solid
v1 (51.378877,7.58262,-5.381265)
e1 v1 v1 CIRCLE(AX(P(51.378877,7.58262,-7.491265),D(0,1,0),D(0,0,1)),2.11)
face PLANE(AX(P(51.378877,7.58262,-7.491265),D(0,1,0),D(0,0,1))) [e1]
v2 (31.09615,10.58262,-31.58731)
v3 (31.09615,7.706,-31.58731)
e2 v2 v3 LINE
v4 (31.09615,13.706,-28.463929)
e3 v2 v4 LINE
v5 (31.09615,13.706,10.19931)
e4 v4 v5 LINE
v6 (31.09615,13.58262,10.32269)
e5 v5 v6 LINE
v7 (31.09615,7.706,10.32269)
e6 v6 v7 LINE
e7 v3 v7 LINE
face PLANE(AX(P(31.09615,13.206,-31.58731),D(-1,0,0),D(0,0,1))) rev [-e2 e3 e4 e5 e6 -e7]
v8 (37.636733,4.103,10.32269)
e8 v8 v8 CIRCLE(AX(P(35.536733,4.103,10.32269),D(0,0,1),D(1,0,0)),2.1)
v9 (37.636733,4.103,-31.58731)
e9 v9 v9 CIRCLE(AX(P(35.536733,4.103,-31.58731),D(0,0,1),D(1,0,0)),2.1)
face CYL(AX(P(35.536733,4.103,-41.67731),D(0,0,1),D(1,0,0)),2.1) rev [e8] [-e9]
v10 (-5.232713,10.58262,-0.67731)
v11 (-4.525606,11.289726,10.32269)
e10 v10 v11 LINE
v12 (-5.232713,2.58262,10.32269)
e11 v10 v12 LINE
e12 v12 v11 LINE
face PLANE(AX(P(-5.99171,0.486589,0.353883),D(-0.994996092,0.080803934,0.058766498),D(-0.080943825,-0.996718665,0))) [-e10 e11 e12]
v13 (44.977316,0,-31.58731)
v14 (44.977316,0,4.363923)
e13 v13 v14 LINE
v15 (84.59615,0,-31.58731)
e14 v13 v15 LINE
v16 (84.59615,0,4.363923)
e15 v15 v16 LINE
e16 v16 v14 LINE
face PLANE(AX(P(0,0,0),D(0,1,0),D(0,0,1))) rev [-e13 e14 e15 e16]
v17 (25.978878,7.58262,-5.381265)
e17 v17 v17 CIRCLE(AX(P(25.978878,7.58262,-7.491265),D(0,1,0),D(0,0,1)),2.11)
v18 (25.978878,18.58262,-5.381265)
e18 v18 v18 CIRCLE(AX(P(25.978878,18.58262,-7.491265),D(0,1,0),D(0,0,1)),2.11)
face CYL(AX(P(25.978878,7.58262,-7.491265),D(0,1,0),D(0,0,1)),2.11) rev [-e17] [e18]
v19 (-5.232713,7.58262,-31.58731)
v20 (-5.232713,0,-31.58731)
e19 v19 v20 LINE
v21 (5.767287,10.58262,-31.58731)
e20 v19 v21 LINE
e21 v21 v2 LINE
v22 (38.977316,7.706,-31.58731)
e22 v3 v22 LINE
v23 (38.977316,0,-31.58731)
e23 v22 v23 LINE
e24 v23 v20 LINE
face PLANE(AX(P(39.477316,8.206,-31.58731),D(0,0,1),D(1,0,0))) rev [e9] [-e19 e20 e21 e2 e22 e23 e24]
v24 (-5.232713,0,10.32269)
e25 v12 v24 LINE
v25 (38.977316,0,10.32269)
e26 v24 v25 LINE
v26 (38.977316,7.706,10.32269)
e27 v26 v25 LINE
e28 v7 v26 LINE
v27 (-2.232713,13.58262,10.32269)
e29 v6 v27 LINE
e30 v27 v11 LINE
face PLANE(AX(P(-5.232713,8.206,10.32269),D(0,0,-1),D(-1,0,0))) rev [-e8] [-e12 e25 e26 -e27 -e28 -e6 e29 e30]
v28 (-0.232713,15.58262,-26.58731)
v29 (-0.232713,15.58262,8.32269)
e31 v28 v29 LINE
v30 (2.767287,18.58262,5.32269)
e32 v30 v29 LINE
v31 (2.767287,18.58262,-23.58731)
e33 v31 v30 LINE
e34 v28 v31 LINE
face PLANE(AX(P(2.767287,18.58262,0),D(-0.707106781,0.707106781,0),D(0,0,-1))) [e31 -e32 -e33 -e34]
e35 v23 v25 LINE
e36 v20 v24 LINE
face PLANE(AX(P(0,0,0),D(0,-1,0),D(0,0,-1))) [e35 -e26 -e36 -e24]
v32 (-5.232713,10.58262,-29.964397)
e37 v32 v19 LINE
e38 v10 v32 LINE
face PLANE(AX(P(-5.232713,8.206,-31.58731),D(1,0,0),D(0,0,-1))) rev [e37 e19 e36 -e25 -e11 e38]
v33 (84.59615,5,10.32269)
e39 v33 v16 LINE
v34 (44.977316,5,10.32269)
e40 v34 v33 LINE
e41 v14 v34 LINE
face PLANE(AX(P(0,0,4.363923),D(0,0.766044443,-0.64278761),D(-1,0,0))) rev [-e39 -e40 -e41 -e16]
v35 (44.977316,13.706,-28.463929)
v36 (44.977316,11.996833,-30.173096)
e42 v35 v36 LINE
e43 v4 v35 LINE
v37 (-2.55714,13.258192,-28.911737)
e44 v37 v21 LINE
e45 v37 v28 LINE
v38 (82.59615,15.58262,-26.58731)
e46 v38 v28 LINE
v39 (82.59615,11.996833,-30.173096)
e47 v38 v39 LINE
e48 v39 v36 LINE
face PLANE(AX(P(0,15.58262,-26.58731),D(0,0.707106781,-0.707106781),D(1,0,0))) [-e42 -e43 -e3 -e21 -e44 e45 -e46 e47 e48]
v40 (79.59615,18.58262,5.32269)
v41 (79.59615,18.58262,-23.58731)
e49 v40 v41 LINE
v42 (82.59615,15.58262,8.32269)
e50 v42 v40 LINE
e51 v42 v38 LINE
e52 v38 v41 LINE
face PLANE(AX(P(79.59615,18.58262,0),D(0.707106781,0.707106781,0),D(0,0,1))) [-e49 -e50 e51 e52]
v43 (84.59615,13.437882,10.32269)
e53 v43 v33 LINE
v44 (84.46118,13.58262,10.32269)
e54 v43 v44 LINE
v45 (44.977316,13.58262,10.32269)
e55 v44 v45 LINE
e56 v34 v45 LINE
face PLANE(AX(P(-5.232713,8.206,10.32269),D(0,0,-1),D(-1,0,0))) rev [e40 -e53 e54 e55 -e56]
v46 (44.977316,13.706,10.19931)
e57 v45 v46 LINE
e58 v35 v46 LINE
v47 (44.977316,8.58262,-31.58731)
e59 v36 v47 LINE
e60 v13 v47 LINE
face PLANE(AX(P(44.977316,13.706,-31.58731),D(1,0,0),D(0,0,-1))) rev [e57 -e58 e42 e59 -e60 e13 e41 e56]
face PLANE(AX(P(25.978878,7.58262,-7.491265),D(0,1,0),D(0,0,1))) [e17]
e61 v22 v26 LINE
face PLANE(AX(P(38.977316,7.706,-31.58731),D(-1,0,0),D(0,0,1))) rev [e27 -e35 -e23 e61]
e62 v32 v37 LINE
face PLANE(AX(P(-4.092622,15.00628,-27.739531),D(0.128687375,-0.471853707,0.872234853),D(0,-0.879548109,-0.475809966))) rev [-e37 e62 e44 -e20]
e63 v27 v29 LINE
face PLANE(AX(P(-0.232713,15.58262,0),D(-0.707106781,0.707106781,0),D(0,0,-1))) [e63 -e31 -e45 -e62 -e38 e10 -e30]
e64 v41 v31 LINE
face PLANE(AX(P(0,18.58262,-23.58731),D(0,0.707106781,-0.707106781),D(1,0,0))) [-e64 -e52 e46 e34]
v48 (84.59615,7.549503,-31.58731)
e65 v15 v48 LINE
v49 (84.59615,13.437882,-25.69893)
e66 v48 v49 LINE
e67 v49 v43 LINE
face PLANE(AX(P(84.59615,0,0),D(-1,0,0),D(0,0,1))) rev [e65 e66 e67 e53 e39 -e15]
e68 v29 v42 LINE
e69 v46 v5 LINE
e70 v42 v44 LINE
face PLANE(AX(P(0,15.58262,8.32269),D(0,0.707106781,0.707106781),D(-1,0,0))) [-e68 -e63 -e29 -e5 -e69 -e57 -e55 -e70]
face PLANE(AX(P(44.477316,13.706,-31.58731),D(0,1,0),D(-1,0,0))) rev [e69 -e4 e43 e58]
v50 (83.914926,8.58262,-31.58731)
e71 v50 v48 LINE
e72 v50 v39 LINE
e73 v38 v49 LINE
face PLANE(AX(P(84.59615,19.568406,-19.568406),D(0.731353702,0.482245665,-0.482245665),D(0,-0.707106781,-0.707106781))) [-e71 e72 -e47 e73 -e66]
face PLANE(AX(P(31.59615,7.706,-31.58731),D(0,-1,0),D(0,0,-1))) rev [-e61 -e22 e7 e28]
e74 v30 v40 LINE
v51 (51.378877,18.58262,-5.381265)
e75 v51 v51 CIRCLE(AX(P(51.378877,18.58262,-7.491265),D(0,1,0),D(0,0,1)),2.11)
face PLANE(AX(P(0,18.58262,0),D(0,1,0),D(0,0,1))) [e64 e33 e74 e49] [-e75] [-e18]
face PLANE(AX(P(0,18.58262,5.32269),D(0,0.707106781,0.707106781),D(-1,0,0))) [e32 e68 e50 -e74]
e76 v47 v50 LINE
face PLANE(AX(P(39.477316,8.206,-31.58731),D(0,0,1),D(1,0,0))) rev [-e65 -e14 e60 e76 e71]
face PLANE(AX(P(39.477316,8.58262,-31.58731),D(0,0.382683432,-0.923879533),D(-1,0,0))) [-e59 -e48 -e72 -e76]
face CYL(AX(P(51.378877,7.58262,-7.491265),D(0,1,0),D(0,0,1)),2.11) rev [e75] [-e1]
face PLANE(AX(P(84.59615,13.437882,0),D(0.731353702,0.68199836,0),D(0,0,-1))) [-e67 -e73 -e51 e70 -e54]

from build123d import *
from OCP.BRepAlgoAPI import BRepAlgoAPI_Cut
from OCP.TopTools import TopTools_ListOfShape
from OCP.BRepFilletAPI import BRepFilletAPI_MakeChamfer

# Parameters (mm, degrees)
BOSS_EXTRUDE1_DEPTH = 8.206
SKETCH2_W           = 36.828862806
SKETCH2_H           = 41.91
BOSS_EXTRUDE2_DEPTH = 7.37662
SKETCH3_W           = 41.91
SKETCH3_H           = 2.37661953
BOSS_EXTRUDE3_DEPTH = 53
SKETCH4_W           = 40.118833935
SKETCH4_H           = 41.91
BOSS_EXTRUDE4_DEPTH = 13.206
SKETCH6_R           = 2.11
CUT_EXTRUDE1_DEPTH  = 8
CHAMFER1_SIZE       = 5
CHAMFER2_START      = -34
CHAMFER2_OUTLINE_W  = 14
CHAMFER2_OUTLINE_H  = 11
CHAMFER2_DEPTH      = 2.19717655
CHAMFER3_SIZE       = 5
CHAMFER6_START      = -8
CHAMFER6_OUTLINE_W  = 11
CHAMFER6_OUTLINE_H  = 14
CHAMFER6_DEPTH      = 1.978157275
CHAMFER7_SIZE       = 2
CHAMFER7_SIZE2      = 2.14473742
CHAMFER8_SIZE       = 2
CHAMFER9_SIZE       = 5
CHAMFER9_SIZE2      = 5.958767963
SKETCH7_R           = 2.1
CUT_EXTRUDE2_DEPTH  = 52
CUT_EXTRUDE3_DEPTH  = 41.91
BOSS_EXTRUDE6_START = 3
SKETCH11_W          = 82.828862806
SKETCH11_H          = 34.91
SKETCH11_R          = 2.11
BOSS_EXTRUDE6_DEPTH = 3
CHAMFER10_SIZE      = 3
CHAMFER11_SIZE      = 3
CHAMFER12_SIZE      = 3
CHAMFER13_SIZE      = 3


with BuildPart() as part:
    # Sketch1 → Boss-Extrude1 (new body)
    with BuildSketch(Plane(origin=(0, 0, 0), x_dir=(1, 0, 0), z_dir=(0, 1, 0))):
        Polygon((39.477316318, 14.786556642), (39.477316318, 31.587309514), (-5.232712553, 31.587309514), (-5.232712553, -10.322690486), (39.477316318, -10.322690486), align=None)
    extrude(amount=BOSS_EXTRUDE1_DEPTH)

    # Sketch2 → Boss-Extrude2 (add)
    with BuildSketch(Plane(origin=(0, 8.206, 0), x_dir=(1, 0, 0), z_dir=(0, 1, 0))):
        with Locations((13.18171885, 10.632309514)):
            Rectangle(SKETCH2_W, SKETCH2_H)
    extrude(amount=BOSS_EXTRUDE2_DEPTH)

    # Sketch3 → Boss-Extrude3 (add)
    with BuildSketch(Plane(origin=(31.596150253, 0, 0), x_dir=(0, 0, -1), z_dir=(1, 0, 0))):
        with Locations((10.632309514, 14.394309765)):
            Rectangle(SKETCH3_W, SKETCH3_H)
    extrude(amount=BOSS_EXTRUDE3_DEPTH)

    # Sketch4 → Boss-Extrude4 (add)
    with BuildSketch(Plane.XZ.offset(-13.206)):
        with Locations((64.536733286, -10.632309514)):
            Rectangle(SKETCH4_W, SKETCH4_H)
    extrude(amount=BOSS_EXTRUDE4_DEPTH)


with BuildPart() as cut_extrude1_tool:
    # Sketch6 → Cut-Extrude1 (new body)
    with BuildSketch(Plane(origin=(0, 15.58261953, 0), x_dir=(1, 0, 0), z_dir=(0, 1, 0))):
        with Locations(Location((25.978877621, 7.491265073, 0), (0, 0, 270))):
            Circle(SKETCH6_R)
        with Locations(Location((51.378877239, 7.491265073, 0), (0, 0, 270))):
            Circle(SKETCH6_R)
    extrude(amount=-CUT_EXTRUDE1_DEPTH)


with BuildPart() as part_1:
    add(part.part)

    # Cut-Extrude1: cut by cut_extrude1_tool, with a tolerance
    cut_extrude1_stock = TopTools_ListOfShape()
    cut_extrude1_stock.Append(part_1.part.wrapped)
    cut_extrude1_tools = TopTools_ListOfShape()
    cut_extrude1_tools.Append(cut_extrude1_tool.part.wrapped)
    cut_extrude1_cut = BRepAlgoAPI_Cut()
    cut_extrude1_cut.SetArguments(cut_extrude1_stock)
    cut_extrude1_cut.SetTools(cut_extrude1_tools)
    cut_extrude1_cut.SetFuzzyValue(0.00001)
    cut_extrude1_cut.Build()
    add(Compound.cast(cut_extrude1_cut.Shape()).solids(), mode=Mode.REPLACE)

    # Chamfer1
    # the kernel refuses this chamfer: 5 mm, written as the material it takes off along each edge
    with BuildSketch(Plane(origin=(31.596150253, 15.58261953, -31.587309514), x_dir=(0, -1, 0), z_dir=(1, 0, 0))) as chamfer1_piece_1:
        Polygon((CHAMFER1_SIZE, 0), (0, -CHAMFER1_SIZE), (0, 0), align=None)
    extrude(amount=65.85841494, mode=Mode.SUBTRACT)
    with BuildSketch(Plane(origin=(-18.091127493, 15.58262, -31.587309514), x_dir=(0, -1, 0), z_dir=(1, 0, 0))) as chamfer1_piece_2:
        Polygon((CHAMFER1_SIZE, 0), (0, -CHAMFER1_SIZE), (0, 0), align=None)
    extrude(amount=49.687277746, mode=Mode.SUBTRACT)

    # Chamfer2: read off the stored shape, not the designer's step
    # Chamfer2 outline → Chamfer2 (cut)
    with BuildSketch(Plane(origin=(0, 0, 0), x_dir=(0.9916852119709467, 0.06123073523081426, -0.11318673694930956), z_dir=(0.128687374509461, -0.47185370653469005, 0.8722348532771071)).offset(CHAMFER2_START)):
        with Locations((4, -4.5)):
            Rectangle(CHAMFER2_OUTLINE_W, CHAMFER2_OUTLINE_H)
    extrude(amount=CHAMFER2_DEPTH, mode=Mode.SUBTRACT)

    # Chamfer3
    chamfer3_edges = [part_1.edges().sort_by_distance(p)[0] for p in [
        (-5.232712553, 15.58262, -8.132309514),
    ]]
    chamfer(chamfer3_edges, length=CHAMFER3_SIZE)

    # Chamfer6: read off the stored shape, not the designer's step
    # Chamfer6 outline → Chamfer6 (cut)
    with BuildSketch(Plane(origin=(0, 0, 0), x_dir=(0.08066336673472338, 0.9967300157061612, -0.004764142883599942), z_dir=(0.9949960919345852, -0.08080393425072713, -0.058766497636892415)).offset(CHAMFER6_START)):
        with Locations((6.5, 5)):
            Rectangle(CHAMFER6_OUTLINE_W, CHAMFER6_OUTLINE_H)
    extrude(amount=CHAMFER6_DEPTH, mode=Mode.SUBTRACT)

    # Chamfer7: one chamfer whose edges measure the first distance from different faces: ONE call of the kernel's chamfer builder (chamfer() names one face for all edges)
    chamfer7_edges_1 = [part_1.edges().sort_by_distance(p)[0] for p in [
        (84.596150253, 15.58261953, -8.132309514),
    ]]
    chamfer7_side_1 = [part_1.faces().sort_by_distance(p)[0] for p in [
        (58.144523378, 15.58261953, -8.13692587),
    ]]
    chamfer7_edges_2 = [part_1.edges().sort_by_distance(p)[0] for p in [
        (84.596150253, 13.08261953, -29.087309514),
    ]]
    chamfer7_side_2 = [part_1.faces().sort_by_distance(p)[0] for p in [
        (61.027936369, 13.256297064, -28.91363198),
    ]]
    chamfer7 = BRepFilletAPI_MakeChamfer(part_1.part.solid().wrapped)
    for e in chamfer7_edges_1:
        chamfer7.Add(CHAMFER7_SIZE, CHAMFER7_SIZE2, e.wrapped, chamfer7_side_1[0].wrapped)  # the first distance lies on this face
    for e in chamfer7_edges_2:
        chamfer7.Add(CHAMFER7_SIZE, CHAMFER7_SIZE2, e.wrapped, chamfer7_side_2[0].wrapped)  # the first distance lies on this face
    add(Compound.cast(chamfer7.Shape()), mode=Mode.REPLACE)

    # Chamfer8
    chamfer8_edges = [part_1.edges().sort_by_distance(p)[0] for p in [
        (63.536733285, 10.58261953, -31.587309514),
        (57.096150253, 15.58261953, 10.322690486),
    ]]
    chamfer(chamfer8_edges, length=CHAMFER8_SIZE)

    # Chamfer9
    chamfer9_edges = [part_1.edges().sort_by_distance(p)[0] for p in [
        (64.536733285, 0, 10.322690486),
    ]]
    chamfer9_side = [part_1.faces().sort_by_distance(p)[0] for p in [
        (83.864230917, 12.890655698, 10.322690486),
    ]]
    chamfer(chamfer9_edges, length=CHAMFER9_SIZE, length2=CHAMFER9_SIZE2, reference=chamfer9_side[0])

    # Sketch7 → Cut-Extrude2 (cut)
    with BuildSketch(Plane.XY.offset(10.322690486)):
        with Locations((35.536733285, 4.103)):
            Circle(SKETCH7_R)
    extrude(amount=-CUT_EXTRUDE2_DEPTH, mode=Mode.SUBTRACT)

    # Sketch9 → Cut-Extrude3 (cut)
    with BuildSketch(Plane.XY.offset(10.322690486)):
        Polygon((31.596150253, 7.706), (38.977316318, 7.706), (38.977316318, 0), (39.477316318, 0), (39.477316318, 8.206), (31.596150253, 8.206), (31.596150253, 13.206), (44.477316318, 13.206), (44.477316318, 0), (44.977316318, 0), (44.977316318, 13.58261953), (44.977316318, 13.706), (44.477316318, 13.706), (31.096150253, 13.706), (31.096150253, 13.58261953), (31.096150253, 13.206), (31.096150253, 7.706), align=None)
    extrude(amount=-CUT_EXTRUDE3_DEPTH, mode=Mode.SUBTRACT)

    # Sketch11 → Boss-Extrude6 (add)
    with BuildSketch(Plane(origin=(0, 15.58261953, 0), x_dir=(1, 0, 0), z_dir=(0, 1, 0)).offset(BOSS_EXTRUDE6_START)):
        with Locations((41.18171885, 9.132309514)):
            Rectangle(SKETCH11_W, SKETCH11_H)
        with Locations(Location((25.978877621, 7.491265073, 0), (0, 0, 270))):
            Circle(SKETCH11_R, mode=Mode.SUBTRACT)
        with Locations(Location((51.378877239, 7.491265073, 0), (0, 0, 270))):
            Circle(SKETCH11_R, mode=Mode.SUBTRACT)
    extrude(amount=-BOSS_EXTRUDE6_DEPTH)

    # Chamfer10
    chamfer10_edges = [part_1.edges().sort_by_distance(p)[0] for p in [
        (41.18171885, 18.58261953, 8.322690486),
    ]]
    chamfer(chamfer10_edges, length=CHAMFER10_SIZE - 0.0001)  # a hair under: the kernel refuses the full size

    # Chamfer11
    chamfer11_edges = [part_1.edges().sort_by_distance(p)[0] for p in [
        (82.596150253, 18.58261953, -10.632259514),
    ]]
    chamfer(chamfer11_edges, length=CHAMFER11_SIZE - 0.0001)  # a hair under: the kernel refuses the full size

    # Chamfer12
    chamfer12_edges = [part_1.edges().sort_by_distance(p)[0] for p in [
        (39.68176885, 18.58261953, -26.587309514),
    ]]
    chamfer(chamfer12_edges, length=CHAMFER12_SIZE - 0.0001)  # a hair under: the kernel refuses the full size

    # Chamfer13
    chamfer13_edges = [part_1.edges().sort_by_distance(p)[0] for p in [
        (-0.232712553, 18.58261953, -9.132309514),
    ]]
    chamfer(chamfer13_edges, length=CHAMFER13_SIZE)


solid = part_1.part
